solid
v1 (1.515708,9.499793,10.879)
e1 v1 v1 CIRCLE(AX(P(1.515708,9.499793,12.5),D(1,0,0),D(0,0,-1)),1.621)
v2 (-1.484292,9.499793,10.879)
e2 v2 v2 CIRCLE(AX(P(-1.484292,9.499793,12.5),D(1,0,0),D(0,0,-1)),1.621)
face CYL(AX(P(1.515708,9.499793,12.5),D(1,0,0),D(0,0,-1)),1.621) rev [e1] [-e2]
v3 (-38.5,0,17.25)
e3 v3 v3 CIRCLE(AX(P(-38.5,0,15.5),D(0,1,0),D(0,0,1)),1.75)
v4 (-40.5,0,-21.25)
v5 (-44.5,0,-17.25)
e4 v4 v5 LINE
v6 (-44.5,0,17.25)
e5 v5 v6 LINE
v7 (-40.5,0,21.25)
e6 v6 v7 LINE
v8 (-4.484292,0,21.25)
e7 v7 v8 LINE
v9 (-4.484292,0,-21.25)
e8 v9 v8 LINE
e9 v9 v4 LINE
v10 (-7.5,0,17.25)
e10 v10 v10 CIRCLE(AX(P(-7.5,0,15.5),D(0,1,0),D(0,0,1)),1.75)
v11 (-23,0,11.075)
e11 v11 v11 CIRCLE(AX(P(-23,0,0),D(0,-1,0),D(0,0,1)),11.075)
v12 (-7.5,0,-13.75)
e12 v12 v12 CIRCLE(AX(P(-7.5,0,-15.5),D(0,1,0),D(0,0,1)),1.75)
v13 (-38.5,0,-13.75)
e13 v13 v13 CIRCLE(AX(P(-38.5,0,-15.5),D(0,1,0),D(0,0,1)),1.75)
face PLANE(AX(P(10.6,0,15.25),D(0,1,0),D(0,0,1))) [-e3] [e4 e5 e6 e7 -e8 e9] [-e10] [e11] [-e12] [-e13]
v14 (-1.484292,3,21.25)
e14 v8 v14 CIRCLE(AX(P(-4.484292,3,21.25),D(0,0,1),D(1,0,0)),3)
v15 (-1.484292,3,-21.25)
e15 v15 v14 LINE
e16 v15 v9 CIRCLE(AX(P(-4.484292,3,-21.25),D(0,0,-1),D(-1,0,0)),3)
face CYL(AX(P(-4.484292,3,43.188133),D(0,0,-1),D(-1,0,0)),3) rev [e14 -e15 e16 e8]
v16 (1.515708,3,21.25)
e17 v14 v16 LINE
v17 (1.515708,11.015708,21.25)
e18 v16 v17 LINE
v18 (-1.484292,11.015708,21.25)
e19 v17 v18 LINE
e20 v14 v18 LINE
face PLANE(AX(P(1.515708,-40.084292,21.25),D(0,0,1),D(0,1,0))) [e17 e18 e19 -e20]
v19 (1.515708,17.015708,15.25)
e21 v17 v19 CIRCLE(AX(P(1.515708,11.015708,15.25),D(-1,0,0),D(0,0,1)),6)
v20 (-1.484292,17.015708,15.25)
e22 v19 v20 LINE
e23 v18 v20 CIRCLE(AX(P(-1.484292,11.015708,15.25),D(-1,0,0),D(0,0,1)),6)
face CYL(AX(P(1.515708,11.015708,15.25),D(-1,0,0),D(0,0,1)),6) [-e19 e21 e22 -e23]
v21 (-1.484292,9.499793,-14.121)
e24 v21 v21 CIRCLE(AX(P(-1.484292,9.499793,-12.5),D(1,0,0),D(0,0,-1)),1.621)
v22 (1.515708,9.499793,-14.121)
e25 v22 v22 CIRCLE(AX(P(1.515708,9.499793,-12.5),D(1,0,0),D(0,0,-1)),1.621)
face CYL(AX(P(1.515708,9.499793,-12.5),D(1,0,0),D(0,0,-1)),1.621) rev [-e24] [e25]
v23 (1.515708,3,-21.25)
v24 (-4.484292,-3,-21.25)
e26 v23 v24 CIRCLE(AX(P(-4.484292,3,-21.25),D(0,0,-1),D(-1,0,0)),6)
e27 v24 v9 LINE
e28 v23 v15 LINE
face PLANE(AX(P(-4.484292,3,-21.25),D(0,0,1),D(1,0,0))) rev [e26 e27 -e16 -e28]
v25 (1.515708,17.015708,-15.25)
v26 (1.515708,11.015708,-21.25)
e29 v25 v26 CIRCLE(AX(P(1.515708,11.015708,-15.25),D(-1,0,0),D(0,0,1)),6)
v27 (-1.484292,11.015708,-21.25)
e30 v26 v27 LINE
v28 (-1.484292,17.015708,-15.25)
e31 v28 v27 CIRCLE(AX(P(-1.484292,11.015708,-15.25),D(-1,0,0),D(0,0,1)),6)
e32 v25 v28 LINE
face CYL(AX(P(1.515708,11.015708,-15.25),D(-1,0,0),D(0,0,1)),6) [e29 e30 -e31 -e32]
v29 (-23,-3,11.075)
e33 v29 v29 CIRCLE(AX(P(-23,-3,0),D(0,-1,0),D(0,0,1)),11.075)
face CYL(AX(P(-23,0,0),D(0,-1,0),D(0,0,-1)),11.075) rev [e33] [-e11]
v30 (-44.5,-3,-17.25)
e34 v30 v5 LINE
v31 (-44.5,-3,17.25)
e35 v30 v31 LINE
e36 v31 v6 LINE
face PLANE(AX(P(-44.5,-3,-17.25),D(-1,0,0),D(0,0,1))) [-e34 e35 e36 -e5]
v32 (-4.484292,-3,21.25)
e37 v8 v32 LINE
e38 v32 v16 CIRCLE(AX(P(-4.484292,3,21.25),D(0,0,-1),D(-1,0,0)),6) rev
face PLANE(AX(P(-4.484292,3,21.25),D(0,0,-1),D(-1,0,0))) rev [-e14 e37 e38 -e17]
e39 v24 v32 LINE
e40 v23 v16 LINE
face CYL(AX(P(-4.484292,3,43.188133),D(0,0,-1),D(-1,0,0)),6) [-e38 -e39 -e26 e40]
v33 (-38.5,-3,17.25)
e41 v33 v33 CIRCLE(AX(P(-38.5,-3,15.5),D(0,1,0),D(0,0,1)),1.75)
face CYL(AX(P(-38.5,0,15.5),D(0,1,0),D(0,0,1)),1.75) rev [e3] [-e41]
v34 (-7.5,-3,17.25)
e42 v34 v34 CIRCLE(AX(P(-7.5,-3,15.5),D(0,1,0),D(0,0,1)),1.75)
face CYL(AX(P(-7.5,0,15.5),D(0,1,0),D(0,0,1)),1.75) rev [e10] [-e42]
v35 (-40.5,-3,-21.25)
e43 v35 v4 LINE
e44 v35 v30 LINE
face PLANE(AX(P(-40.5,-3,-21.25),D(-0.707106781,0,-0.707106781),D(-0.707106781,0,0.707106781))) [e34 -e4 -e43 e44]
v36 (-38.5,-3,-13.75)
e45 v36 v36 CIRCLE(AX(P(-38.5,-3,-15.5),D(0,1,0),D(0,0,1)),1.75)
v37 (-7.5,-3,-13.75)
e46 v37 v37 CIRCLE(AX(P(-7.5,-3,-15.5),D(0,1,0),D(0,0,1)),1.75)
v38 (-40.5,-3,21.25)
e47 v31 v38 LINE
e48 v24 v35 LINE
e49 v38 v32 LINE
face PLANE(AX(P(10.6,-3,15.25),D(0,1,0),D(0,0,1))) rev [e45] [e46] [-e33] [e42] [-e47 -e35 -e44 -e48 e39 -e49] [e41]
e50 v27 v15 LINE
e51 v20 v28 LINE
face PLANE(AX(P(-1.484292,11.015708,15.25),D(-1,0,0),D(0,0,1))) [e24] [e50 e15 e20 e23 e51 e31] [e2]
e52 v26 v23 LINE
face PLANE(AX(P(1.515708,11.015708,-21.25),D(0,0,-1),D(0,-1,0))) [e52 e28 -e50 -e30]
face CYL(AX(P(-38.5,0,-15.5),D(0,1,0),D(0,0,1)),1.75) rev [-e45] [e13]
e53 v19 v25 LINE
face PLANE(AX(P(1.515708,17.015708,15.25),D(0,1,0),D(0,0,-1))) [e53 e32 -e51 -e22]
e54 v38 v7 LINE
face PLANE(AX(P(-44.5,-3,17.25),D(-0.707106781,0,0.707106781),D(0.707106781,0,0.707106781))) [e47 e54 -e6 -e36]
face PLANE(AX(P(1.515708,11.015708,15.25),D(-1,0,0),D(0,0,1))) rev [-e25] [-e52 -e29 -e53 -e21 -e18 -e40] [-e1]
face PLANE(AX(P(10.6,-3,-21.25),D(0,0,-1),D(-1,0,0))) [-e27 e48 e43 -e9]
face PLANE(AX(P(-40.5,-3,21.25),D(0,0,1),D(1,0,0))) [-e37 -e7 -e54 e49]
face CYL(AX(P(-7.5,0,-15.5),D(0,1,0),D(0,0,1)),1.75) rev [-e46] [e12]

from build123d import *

# Parameters (mm, degrees)
BOSS_EXTRUDE1_DEPTH        = 3
M3_CLEARANCE_HOLE1_D       = 3.242
F_3_5_3_5_DIAMETER_HOLE1_D = 3.5
SKETCH14_R                 = 11.075
CUT_EXTRUDE1_DEPTH         = 50.404579747
SKETCHED_START             = 0.899268265
SKETCHED_BEND1_OUTLINE_W   = 3
SKETCHED_BEND1_OUTLINE_H   = 42.5
SKETCHED_BEND1_DEPTH       = 15.700731735
SKETCHED_START_2           = -1.484291735
SKETCHED_BEND1_2_OUTLINE_R = 1.621
SKETCHED_BEND1_2_DEPTH     = 0.01644
SKETCHED_START_3           = -4.484291735
SKETCHED_BEND1_3_OUTLINE_R = 1.621
SKETCHED_BEND1_3_DEPTH     = 6
SKETCHED_START_4           = -21.25
SKETCHED_BEND1_4_DEPTH     = 42.5


with BuildPart() as part:
    # Sketch7 → Boss-Extrude1 (new body)
    with BuildSketch(Plane(origin=(0, 0, 0), x_dir=(1, 0, 0), z_dir=(0, 1, 0))):
        with BuildLine():
            Line((-40.5, -21.25), (10.6, -21.25))
            ThreePointArc((10.6, -21.25), (14.842640687, -19.492640687), (16.6, -15.25))
            Line((16.6, -15.25), (16.6, 15.25))
            ThreePointArc((16.6, 15.25), (14.842640687, 19.492640687), (10.6, 21.25))
            Line((10.6, 21.25), (-40.5, 21.25))
            Line((-40.5, 21.25), (-44.5, 17.25))
            Line((-44.5, 17.25), (-44.5, -17.25))
            Line((-44.5, -17.25), (-40.5, -21.25))
        make_face()
    extrude(amount=-BOSS_EXTRUDE1_DEPTH)

    # M3 Clearance Hole1 (through all)
    with Locations(Plane(origin=(0, -3, 0), x_dir=(-1, 0, 0), z_dir=(0, -1, 0))):
        with Locations((-9.084084573, -12.5), (-9.084084573, 12.5)):
            Hole(M3_CLEARANCE_HOLE1_D / 2)

    # Ø3.5 (3.5) Diameter Hole1 (through all)
    with Locations(Plane(origin=(0, 0, 0), x_dir=(1, 0, 0), z_dir=(0, 1, 0))):
        with Locations((-7.5, -15.5), (-38.5, -15.5), (-38.5, 15.5), (-7.5, 15.5)):
            Hole(F_3_5_3_5_DIAMETER_HOLE1_D / 2)

    # Sketch14 → Cut-Extrude1 (cut, through all)
    with BuildSketch(Plane.XZ.offset(3)):
        with Locations(Location((-23, 0, 0), (0, 0, 90))):
            Circle(SKETCH14_R)
    extrude(amount=-CUT_EXTRUDE1_DEPTH, mode=Mode.SUBTRACT)

    # Sketched Bend1: read off the stored shape, not the designer's step
    # Sketched Bend1 outline → Sketched Bend1 (cut)
    with BuildSketch(Plane.YZ.offset(SKETCHED_START)):
        with Locations((-1.5, 0)):
            Rectangle(SKETCHED_BEND1_OUTLINE_W, SKETCHED_BEND1_OUTLINE_H)
    extrude(amount=SKETCHED_BEND1_DEPTH, mode=Mode.SUBTRACT)

    # Sketched Bend1 2 outline → Sketched Bend1 2 (add)
    with BuildSketch(Plane.YZ.offset(SKETCHED_START_2)):
        with BuildLine():
            Line((0, -21.25), (11.015708265, -21.25))
            ThreePointArc((11.015708265, -21.25), (15.258348952, -19.492640687), (17.015708265, -15.25))
            Line((17.015708265, -15.25), (17.015708265, 15.25))
            ThreePointArc((17.015708265, 15.25), (15.258348952, 19.492640687), (11.015708265, 21.25))
            Line((11.015708265, 21.25), (0, 21.25))
            Line((0, 21.25), (0, -21.25))
        make_face()
        with Locations((9.499792838, -12.5)):
            Circle(SKETCHED_BEND1_2_OUTLINE_R, mode=Mode.SUBTRACT)
        with Locations((9.499792838, 12.5)):
            Circle(SKETCHED_BEND1_2_OUTLINE_R, mode=Mode.SUBTRACT)
    extrude(amount=SKETCHED_BEND1_2_DEPTH)

    # Sketched Bend1 3 outline → Sketched Bend1 3 (add)
    with BuildSketch(Plane.YZ.offset(SKETCHED_START_3)):
        with BuildLine():
            Line((0, -21.25), (11.015708265, -21.25))
            ThreePointArc((11.015708265, -21.25), (15.258348952, -19.492640687), (17.015708265, -15.25))
            Line((17.015708265, -15.25), (17.015708265, 15.25))
            ThreePointArc((17.015708265, 15.25), (15.258348952, 19.492640687), (11.015708265, 21.25))
            Line((11.015708265, 21.25), (0, 21.25))
            Line((0, 21.25), (0, -21.25))
        make_face()
        with Locations((9.499792838, -12.5)):
            Circle(SKETCHED_BEND1_3_OUTLINE_R, mode=Mode.SUBTRACT)
        with Locations((9.499792838, 12.5)):
            Circle(SKETCHED_BEND1_3_OUTLINE_R, mode=Mode.SUBTRACT)
    extrude(amount=SKETCHED_BEND1_3_DEPTH)

    # Sketched Bend1 4 outline → Sketched Bend1 4 (cut)
    with BuildSketch(Plane.XY.offset(SKETCHED_START_4)):
        with BuildLine():
            Line((-1.484291735, 3), (-1.484291735, 17.015708265))
            Line((-1.484291735, 17.015708265), (-4.484291735, 17.015708265))
            Line((-4.484291735, 17.015708265), (-4.484291735, 0))
            ThreePointArc((-4.484291735, 0), (-2.362971392, 0.878679656), (-1.484291735, 3))
        make_face()
        with BuildLine():
            Line((1.515708265, 0), (1.515708265, 3))
            ThreePointArc((1.515708265, 3), (-0.241651048, -1.242640687), (-4.484291735, -3))
            Line((-4.484291735, -3), (0.899268265, -3))
            Line((0.899268265, -3), (0.899268265, 0))
            Line((0.899268265, 0), (1.515708265, 0))
        make_face()
    extrude(amount=SKETCHED_BEND1_4_DEPTH, mode=Mode.SUBTRACT)


solid = part.part
